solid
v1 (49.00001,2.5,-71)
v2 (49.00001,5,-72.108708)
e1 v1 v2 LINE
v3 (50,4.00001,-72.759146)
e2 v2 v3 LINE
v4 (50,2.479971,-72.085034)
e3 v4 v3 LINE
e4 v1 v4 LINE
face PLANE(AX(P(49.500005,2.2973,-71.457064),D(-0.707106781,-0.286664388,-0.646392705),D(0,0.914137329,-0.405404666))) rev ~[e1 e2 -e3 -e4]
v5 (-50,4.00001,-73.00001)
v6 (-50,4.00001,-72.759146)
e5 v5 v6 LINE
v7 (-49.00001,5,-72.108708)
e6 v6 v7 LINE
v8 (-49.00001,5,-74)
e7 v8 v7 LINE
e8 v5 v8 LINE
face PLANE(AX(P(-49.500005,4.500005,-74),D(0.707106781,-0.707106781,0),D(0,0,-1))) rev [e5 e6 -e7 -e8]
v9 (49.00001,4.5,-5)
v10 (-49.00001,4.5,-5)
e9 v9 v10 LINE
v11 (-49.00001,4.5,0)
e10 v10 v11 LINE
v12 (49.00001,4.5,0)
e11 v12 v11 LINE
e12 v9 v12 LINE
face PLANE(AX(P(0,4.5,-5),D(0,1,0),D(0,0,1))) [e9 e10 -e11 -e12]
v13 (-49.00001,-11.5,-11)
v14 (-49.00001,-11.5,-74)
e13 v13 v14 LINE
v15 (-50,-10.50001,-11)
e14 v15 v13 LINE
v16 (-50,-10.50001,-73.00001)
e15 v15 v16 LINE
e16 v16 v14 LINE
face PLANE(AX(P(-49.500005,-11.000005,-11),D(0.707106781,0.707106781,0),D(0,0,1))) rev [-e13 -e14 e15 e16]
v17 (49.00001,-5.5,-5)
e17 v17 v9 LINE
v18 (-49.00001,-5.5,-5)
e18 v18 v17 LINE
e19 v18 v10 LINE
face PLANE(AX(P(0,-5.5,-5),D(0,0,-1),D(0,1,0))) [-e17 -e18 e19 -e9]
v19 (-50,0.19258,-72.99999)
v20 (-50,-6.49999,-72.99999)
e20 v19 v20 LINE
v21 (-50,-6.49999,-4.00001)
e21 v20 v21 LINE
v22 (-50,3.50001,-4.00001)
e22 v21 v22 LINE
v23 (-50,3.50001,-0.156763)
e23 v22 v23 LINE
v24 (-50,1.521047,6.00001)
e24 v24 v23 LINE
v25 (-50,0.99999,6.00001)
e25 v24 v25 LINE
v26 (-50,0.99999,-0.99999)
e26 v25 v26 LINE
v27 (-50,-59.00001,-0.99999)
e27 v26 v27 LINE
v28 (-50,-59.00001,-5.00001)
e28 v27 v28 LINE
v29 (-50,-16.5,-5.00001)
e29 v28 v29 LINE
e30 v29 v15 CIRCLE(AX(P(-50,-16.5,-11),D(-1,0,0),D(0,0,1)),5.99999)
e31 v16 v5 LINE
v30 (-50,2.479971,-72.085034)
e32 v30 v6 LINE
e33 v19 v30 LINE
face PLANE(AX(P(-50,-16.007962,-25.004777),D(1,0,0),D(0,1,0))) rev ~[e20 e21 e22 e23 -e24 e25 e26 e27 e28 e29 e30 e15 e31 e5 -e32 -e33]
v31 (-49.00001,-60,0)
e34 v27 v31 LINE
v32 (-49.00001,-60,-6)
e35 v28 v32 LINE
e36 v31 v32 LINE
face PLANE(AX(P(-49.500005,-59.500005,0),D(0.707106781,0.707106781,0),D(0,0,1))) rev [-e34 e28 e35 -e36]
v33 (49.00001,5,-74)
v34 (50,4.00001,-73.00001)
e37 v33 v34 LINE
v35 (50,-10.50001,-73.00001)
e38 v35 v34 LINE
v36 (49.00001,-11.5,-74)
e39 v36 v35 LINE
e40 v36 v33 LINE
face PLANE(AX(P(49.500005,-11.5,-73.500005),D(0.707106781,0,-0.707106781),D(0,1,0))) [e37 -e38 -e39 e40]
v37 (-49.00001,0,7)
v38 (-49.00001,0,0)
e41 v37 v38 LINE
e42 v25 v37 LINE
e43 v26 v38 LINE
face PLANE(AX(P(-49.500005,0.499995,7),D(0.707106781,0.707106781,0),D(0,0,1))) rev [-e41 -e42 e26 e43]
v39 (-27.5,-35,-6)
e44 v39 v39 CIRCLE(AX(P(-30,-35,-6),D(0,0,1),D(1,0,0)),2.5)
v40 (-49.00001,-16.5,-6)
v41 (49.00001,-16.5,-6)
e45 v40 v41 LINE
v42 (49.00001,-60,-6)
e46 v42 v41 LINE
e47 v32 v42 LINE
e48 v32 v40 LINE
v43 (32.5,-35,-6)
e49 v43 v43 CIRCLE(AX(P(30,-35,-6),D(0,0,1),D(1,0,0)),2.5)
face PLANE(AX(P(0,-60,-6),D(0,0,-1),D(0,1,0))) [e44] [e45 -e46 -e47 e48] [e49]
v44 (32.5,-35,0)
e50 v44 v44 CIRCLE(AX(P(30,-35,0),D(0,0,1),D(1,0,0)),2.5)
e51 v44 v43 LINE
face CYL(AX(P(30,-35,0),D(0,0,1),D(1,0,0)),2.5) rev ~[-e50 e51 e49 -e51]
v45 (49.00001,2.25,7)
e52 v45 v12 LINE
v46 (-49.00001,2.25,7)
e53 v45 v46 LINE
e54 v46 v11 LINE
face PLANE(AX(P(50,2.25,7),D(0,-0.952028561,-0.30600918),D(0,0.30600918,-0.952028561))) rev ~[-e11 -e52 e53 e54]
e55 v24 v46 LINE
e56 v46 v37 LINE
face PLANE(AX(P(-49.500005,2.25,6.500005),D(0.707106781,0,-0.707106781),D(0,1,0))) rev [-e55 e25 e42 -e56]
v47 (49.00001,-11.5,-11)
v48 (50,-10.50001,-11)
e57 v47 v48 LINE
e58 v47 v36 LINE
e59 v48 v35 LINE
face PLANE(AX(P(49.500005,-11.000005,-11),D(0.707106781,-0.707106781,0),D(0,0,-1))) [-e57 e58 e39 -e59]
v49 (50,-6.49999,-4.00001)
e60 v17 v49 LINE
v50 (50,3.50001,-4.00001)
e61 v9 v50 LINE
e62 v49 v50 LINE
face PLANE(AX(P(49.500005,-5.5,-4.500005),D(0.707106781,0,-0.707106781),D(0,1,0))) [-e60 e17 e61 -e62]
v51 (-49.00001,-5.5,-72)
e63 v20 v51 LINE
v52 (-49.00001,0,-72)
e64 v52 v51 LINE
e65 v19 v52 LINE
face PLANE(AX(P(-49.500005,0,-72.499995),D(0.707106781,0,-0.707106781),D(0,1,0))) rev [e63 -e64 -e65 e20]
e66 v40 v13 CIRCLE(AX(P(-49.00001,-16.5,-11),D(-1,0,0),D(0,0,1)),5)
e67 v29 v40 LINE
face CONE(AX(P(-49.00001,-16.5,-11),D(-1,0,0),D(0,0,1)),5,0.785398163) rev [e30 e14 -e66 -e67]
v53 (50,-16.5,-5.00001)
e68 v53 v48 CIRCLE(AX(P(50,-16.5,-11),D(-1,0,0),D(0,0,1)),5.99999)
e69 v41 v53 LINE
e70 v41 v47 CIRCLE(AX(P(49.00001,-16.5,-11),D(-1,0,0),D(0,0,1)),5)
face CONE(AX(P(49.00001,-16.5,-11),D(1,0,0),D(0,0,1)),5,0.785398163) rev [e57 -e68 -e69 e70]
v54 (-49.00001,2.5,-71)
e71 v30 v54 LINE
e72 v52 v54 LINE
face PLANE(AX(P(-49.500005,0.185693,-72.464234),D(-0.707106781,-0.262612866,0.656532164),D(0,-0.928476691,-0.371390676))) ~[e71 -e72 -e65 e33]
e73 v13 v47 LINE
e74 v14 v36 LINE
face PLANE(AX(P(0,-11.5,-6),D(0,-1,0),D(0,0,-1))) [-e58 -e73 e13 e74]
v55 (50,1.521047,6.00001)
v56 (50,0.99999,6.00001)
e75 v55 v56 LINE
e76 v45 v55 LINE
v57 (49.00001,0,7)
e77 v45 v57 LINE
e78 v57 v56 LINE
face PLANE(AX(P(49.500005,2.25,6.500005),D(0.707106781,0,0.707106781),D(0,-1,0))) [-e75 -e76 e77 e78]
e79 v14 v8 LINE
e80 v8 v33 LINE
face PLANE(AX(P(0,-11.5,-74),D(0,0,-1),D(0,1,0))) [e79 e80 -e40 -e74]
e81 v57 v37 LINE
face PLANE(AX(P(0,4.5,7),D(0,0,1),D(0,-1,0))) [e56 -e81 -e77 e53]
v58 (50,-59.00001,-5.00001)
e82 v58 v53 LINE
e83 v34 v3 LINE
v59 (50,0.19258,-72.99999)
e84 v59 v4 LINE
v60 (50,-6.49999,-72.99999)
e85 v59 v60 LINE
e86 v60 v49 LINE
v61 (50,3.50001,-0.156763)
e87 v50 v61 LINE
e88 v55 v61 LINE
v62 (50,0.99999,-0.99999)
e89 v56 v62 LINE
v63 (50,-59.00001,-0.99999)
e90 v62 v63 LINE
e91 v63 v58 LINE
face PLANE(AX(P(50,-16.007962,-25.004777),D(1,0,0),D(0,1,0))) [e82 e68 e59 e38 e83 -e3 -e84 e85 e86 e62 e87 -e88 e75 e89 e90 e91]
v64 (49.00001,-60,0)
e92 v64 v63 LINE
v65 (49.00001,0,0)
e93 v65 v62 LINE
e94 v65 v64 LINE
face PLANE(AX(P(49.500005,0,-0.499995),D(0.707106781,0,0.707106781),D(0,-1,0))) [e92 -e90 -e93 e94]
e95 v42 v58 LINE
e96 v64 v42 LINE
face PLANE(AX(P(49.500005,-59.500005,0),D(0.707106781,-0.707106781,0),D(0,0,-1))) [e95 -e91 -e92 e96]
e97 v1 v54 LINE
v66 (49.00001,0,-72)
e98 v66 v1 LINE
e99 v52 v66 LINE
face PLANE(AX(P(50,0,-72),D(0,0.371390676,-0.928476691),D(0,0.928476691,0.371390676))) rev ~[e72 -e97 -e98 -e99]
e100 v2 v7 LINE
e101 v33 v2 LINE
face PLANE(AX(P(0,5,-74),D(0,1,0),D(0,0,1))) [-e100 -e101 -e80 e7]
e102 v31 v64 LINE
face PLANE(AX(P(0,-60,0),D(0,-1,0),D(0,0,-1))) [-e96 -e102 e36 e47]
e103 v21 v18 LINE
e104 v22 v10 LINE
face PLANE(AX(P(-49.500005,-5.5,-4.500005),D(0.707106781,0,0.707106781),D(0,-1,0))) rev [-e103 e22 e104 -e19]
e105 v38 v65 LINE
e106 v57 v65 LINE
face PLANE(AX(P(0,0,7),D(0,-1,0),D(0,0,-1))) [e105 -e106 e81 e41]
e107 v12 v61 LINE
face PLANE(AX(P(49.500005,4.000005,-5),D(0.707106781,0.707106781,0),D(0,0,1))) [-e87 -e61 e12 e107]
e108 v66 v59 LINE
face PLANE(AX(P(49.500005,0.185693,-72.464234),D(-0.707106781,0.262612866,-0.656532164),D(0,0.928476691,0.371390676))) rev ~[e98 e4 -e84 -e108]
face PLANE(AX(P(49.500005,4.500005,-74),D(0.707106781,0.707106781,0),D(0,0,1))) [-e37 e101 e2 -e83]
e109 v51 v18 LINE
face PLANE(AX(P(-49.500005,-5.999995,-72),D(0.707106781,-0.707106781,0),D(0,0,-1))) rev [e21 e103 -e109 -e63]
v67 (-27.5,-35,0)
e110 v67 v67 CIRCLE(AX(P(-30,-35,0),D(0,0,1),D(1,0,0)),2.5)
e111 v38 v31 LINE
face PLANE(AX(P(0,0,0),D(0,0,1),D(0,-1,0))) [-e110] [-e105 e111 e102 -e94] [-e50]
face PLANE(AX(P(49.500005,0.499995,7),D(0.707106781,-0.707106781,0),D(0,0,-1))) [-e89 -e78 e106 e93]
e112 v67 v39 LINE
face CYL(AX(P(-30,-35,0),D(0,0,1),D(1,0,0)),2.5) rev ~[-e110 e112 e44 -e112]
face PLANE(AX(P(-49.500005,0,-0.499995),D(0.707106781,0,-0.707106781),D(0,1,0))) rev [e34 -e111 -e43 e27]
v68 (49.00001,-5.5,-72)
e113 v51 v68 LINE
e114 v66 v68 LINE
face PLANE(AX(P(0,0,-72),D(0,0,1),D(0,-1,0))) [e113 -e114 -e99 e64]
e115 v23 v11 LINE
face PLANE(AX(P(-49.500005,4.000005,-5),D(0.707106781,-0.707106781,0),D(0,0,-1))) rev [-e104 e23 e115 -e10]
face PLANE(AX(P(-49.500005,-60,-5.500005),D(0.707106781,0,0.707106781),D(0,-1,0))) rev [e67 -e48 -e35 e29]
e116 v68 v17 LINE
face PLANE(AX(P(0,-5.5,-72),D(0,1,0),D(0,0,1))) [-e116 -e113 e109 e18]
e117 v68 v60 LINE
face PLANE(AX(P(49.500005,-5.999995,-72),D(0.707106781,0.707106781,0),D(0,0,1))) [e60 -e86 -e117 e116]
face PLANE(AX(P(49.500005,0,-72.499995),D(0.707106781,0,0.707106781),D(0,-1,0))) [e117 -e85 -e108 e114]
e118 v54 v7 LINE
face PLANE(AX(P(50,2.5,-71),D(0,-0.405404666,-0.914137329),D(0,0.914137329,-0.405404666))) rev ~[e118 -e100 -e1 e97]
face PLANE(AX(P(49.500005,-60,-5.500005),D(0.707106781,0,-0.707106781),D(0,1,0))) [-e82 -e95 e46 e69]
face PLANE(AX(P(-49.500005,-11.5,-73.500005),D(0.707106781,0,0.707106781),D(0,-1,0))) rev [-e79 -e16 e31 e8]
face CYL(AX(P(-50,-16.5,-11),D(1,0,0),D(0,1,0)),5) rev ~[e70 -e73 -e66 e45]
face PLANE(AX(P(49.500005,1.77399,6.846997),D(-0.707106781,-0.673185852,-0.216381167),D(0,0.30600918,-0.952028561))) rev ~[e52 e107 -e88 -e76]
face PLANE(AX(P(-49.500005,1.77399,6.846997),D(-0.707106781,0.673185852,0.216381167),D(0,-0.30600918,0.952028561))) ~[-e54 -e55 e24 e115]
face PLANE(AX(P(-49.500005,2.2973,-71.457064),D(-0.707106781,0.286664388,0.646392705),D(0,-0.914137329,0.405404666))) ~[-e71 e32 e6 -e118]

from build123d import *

# Parameters (mm, degrees)
F1_DEPTH = 50
F3_DEPTH = 100
F5_DEPTH = 100
F6_R     = 2.5
F7_DEPTH = 6
F8_R     = 5
F9_SIZE  = 0.99999


# Not quite as in the source:
# - a fillet or chamfer is up to 0.001 mm smaller than in the source, because OpenCascade refuses the exact size


with BuildPart() as f1:
    # F0 (on Right) → F1 (new body, symmetric)
    with BuildSketch(Plane.YZ):
        Polygon((0, 7), (0, 0), (-60, 0), (-60, -6), (-11.5, -6), (-11.5, -74), (5, -74), (5, -71), (0, -71), (0, -72), (-5.5, -72), (-5.5, -5), (4.5, -5), (4.5, 7), align=None)
    extrude(amount=F1_DEPTH, both=True)

    # F2 (on face) → F3 (cut, through all)
    with BuildSketch(Plane.YZ.offset(50)):
        Polygon((4.5, 7), (2.25, 7), (4.5, 0), align=None)
    extrude(amount=-F3_DEPTH, mode=Mode.SUBTRACT)

    # F4 (on face) → F5 (cut, through all)
    with BuildSketch(Plane.YZ.offset(50)):
        Polygon((0, -71), (0, -72), (2.5, -71), align=None)
        Polygon((5, -71), (2.5, -71), (5, -72.108708322), align=None)
    extrude(amount=-F5_DEPTH, mode=Mode.SUBTRACT)

    # F6 (on face) → F7 (cut, through all)
    with BuildSketch(Plane.XY):
        with Locations((-30, -35)):
            Circle(F6_R)
        with Locations((30, -35)):
            Circle(F6_R)
    extrude(amount=-F7_DEPTH, mode=Mode.SUBTRACT)

    # F8
    f8_edges = [f1.edges().sort_by_distance(p)[0] for p in [
        (0, -11.5, -6),
    ]]
    fillet(f8_edges, radius=F8_R)

    # F9 (size 1 in the source; OpenCascade refuses exactly that, so slightly less here)
    f9_edges = [f1.edges().sort_by_distance(p)[0] for p in [
        (50, -11.5, -42.5),
        (50, -12.964466, -7.464466),
        (50, -3.25, -74),
        (50, -38.25, -6),
        (50, 5, -73.054354),
        (50, -60, -3),
        (50, 3.75, -71.554354),
        (50, -30, 0),
        (50, 1.25, -71.5),
        (50, 0, 3.5),
        (50, -2.75, -72),
        (50, 1.125, 7),
        (50, -5.5, -38.5),
        (50, 3.375, 3.5),
        (50, -0.5, -5),
        (50, 4.5, -2.5),
        (-50, -11.5, -42.5),
        (-50, -12.964466, -7.464466),
        (-50, -3.25, -74),
        (-50, -38.25, -6),
        (-50, 5, -73.054354),
        (-50, -60, -3),
        (-50, 3.75, -71.554354),
        (-50, -30, 0),
        (-50, 1.25, -71.5),
        (-50, 0, 3.5),
        (-50, -2.75, -72),
        (-50, 1.125, 7),
        (-50, -5.5, -38.5),
        (-50, 3.375, 3.5),
        (-50, -0.5, -5),
        (-50, 4.5, -2.5),
    ]]
    chamfer(f9_edges, length=F9_SIZE)


solid = f1.part
